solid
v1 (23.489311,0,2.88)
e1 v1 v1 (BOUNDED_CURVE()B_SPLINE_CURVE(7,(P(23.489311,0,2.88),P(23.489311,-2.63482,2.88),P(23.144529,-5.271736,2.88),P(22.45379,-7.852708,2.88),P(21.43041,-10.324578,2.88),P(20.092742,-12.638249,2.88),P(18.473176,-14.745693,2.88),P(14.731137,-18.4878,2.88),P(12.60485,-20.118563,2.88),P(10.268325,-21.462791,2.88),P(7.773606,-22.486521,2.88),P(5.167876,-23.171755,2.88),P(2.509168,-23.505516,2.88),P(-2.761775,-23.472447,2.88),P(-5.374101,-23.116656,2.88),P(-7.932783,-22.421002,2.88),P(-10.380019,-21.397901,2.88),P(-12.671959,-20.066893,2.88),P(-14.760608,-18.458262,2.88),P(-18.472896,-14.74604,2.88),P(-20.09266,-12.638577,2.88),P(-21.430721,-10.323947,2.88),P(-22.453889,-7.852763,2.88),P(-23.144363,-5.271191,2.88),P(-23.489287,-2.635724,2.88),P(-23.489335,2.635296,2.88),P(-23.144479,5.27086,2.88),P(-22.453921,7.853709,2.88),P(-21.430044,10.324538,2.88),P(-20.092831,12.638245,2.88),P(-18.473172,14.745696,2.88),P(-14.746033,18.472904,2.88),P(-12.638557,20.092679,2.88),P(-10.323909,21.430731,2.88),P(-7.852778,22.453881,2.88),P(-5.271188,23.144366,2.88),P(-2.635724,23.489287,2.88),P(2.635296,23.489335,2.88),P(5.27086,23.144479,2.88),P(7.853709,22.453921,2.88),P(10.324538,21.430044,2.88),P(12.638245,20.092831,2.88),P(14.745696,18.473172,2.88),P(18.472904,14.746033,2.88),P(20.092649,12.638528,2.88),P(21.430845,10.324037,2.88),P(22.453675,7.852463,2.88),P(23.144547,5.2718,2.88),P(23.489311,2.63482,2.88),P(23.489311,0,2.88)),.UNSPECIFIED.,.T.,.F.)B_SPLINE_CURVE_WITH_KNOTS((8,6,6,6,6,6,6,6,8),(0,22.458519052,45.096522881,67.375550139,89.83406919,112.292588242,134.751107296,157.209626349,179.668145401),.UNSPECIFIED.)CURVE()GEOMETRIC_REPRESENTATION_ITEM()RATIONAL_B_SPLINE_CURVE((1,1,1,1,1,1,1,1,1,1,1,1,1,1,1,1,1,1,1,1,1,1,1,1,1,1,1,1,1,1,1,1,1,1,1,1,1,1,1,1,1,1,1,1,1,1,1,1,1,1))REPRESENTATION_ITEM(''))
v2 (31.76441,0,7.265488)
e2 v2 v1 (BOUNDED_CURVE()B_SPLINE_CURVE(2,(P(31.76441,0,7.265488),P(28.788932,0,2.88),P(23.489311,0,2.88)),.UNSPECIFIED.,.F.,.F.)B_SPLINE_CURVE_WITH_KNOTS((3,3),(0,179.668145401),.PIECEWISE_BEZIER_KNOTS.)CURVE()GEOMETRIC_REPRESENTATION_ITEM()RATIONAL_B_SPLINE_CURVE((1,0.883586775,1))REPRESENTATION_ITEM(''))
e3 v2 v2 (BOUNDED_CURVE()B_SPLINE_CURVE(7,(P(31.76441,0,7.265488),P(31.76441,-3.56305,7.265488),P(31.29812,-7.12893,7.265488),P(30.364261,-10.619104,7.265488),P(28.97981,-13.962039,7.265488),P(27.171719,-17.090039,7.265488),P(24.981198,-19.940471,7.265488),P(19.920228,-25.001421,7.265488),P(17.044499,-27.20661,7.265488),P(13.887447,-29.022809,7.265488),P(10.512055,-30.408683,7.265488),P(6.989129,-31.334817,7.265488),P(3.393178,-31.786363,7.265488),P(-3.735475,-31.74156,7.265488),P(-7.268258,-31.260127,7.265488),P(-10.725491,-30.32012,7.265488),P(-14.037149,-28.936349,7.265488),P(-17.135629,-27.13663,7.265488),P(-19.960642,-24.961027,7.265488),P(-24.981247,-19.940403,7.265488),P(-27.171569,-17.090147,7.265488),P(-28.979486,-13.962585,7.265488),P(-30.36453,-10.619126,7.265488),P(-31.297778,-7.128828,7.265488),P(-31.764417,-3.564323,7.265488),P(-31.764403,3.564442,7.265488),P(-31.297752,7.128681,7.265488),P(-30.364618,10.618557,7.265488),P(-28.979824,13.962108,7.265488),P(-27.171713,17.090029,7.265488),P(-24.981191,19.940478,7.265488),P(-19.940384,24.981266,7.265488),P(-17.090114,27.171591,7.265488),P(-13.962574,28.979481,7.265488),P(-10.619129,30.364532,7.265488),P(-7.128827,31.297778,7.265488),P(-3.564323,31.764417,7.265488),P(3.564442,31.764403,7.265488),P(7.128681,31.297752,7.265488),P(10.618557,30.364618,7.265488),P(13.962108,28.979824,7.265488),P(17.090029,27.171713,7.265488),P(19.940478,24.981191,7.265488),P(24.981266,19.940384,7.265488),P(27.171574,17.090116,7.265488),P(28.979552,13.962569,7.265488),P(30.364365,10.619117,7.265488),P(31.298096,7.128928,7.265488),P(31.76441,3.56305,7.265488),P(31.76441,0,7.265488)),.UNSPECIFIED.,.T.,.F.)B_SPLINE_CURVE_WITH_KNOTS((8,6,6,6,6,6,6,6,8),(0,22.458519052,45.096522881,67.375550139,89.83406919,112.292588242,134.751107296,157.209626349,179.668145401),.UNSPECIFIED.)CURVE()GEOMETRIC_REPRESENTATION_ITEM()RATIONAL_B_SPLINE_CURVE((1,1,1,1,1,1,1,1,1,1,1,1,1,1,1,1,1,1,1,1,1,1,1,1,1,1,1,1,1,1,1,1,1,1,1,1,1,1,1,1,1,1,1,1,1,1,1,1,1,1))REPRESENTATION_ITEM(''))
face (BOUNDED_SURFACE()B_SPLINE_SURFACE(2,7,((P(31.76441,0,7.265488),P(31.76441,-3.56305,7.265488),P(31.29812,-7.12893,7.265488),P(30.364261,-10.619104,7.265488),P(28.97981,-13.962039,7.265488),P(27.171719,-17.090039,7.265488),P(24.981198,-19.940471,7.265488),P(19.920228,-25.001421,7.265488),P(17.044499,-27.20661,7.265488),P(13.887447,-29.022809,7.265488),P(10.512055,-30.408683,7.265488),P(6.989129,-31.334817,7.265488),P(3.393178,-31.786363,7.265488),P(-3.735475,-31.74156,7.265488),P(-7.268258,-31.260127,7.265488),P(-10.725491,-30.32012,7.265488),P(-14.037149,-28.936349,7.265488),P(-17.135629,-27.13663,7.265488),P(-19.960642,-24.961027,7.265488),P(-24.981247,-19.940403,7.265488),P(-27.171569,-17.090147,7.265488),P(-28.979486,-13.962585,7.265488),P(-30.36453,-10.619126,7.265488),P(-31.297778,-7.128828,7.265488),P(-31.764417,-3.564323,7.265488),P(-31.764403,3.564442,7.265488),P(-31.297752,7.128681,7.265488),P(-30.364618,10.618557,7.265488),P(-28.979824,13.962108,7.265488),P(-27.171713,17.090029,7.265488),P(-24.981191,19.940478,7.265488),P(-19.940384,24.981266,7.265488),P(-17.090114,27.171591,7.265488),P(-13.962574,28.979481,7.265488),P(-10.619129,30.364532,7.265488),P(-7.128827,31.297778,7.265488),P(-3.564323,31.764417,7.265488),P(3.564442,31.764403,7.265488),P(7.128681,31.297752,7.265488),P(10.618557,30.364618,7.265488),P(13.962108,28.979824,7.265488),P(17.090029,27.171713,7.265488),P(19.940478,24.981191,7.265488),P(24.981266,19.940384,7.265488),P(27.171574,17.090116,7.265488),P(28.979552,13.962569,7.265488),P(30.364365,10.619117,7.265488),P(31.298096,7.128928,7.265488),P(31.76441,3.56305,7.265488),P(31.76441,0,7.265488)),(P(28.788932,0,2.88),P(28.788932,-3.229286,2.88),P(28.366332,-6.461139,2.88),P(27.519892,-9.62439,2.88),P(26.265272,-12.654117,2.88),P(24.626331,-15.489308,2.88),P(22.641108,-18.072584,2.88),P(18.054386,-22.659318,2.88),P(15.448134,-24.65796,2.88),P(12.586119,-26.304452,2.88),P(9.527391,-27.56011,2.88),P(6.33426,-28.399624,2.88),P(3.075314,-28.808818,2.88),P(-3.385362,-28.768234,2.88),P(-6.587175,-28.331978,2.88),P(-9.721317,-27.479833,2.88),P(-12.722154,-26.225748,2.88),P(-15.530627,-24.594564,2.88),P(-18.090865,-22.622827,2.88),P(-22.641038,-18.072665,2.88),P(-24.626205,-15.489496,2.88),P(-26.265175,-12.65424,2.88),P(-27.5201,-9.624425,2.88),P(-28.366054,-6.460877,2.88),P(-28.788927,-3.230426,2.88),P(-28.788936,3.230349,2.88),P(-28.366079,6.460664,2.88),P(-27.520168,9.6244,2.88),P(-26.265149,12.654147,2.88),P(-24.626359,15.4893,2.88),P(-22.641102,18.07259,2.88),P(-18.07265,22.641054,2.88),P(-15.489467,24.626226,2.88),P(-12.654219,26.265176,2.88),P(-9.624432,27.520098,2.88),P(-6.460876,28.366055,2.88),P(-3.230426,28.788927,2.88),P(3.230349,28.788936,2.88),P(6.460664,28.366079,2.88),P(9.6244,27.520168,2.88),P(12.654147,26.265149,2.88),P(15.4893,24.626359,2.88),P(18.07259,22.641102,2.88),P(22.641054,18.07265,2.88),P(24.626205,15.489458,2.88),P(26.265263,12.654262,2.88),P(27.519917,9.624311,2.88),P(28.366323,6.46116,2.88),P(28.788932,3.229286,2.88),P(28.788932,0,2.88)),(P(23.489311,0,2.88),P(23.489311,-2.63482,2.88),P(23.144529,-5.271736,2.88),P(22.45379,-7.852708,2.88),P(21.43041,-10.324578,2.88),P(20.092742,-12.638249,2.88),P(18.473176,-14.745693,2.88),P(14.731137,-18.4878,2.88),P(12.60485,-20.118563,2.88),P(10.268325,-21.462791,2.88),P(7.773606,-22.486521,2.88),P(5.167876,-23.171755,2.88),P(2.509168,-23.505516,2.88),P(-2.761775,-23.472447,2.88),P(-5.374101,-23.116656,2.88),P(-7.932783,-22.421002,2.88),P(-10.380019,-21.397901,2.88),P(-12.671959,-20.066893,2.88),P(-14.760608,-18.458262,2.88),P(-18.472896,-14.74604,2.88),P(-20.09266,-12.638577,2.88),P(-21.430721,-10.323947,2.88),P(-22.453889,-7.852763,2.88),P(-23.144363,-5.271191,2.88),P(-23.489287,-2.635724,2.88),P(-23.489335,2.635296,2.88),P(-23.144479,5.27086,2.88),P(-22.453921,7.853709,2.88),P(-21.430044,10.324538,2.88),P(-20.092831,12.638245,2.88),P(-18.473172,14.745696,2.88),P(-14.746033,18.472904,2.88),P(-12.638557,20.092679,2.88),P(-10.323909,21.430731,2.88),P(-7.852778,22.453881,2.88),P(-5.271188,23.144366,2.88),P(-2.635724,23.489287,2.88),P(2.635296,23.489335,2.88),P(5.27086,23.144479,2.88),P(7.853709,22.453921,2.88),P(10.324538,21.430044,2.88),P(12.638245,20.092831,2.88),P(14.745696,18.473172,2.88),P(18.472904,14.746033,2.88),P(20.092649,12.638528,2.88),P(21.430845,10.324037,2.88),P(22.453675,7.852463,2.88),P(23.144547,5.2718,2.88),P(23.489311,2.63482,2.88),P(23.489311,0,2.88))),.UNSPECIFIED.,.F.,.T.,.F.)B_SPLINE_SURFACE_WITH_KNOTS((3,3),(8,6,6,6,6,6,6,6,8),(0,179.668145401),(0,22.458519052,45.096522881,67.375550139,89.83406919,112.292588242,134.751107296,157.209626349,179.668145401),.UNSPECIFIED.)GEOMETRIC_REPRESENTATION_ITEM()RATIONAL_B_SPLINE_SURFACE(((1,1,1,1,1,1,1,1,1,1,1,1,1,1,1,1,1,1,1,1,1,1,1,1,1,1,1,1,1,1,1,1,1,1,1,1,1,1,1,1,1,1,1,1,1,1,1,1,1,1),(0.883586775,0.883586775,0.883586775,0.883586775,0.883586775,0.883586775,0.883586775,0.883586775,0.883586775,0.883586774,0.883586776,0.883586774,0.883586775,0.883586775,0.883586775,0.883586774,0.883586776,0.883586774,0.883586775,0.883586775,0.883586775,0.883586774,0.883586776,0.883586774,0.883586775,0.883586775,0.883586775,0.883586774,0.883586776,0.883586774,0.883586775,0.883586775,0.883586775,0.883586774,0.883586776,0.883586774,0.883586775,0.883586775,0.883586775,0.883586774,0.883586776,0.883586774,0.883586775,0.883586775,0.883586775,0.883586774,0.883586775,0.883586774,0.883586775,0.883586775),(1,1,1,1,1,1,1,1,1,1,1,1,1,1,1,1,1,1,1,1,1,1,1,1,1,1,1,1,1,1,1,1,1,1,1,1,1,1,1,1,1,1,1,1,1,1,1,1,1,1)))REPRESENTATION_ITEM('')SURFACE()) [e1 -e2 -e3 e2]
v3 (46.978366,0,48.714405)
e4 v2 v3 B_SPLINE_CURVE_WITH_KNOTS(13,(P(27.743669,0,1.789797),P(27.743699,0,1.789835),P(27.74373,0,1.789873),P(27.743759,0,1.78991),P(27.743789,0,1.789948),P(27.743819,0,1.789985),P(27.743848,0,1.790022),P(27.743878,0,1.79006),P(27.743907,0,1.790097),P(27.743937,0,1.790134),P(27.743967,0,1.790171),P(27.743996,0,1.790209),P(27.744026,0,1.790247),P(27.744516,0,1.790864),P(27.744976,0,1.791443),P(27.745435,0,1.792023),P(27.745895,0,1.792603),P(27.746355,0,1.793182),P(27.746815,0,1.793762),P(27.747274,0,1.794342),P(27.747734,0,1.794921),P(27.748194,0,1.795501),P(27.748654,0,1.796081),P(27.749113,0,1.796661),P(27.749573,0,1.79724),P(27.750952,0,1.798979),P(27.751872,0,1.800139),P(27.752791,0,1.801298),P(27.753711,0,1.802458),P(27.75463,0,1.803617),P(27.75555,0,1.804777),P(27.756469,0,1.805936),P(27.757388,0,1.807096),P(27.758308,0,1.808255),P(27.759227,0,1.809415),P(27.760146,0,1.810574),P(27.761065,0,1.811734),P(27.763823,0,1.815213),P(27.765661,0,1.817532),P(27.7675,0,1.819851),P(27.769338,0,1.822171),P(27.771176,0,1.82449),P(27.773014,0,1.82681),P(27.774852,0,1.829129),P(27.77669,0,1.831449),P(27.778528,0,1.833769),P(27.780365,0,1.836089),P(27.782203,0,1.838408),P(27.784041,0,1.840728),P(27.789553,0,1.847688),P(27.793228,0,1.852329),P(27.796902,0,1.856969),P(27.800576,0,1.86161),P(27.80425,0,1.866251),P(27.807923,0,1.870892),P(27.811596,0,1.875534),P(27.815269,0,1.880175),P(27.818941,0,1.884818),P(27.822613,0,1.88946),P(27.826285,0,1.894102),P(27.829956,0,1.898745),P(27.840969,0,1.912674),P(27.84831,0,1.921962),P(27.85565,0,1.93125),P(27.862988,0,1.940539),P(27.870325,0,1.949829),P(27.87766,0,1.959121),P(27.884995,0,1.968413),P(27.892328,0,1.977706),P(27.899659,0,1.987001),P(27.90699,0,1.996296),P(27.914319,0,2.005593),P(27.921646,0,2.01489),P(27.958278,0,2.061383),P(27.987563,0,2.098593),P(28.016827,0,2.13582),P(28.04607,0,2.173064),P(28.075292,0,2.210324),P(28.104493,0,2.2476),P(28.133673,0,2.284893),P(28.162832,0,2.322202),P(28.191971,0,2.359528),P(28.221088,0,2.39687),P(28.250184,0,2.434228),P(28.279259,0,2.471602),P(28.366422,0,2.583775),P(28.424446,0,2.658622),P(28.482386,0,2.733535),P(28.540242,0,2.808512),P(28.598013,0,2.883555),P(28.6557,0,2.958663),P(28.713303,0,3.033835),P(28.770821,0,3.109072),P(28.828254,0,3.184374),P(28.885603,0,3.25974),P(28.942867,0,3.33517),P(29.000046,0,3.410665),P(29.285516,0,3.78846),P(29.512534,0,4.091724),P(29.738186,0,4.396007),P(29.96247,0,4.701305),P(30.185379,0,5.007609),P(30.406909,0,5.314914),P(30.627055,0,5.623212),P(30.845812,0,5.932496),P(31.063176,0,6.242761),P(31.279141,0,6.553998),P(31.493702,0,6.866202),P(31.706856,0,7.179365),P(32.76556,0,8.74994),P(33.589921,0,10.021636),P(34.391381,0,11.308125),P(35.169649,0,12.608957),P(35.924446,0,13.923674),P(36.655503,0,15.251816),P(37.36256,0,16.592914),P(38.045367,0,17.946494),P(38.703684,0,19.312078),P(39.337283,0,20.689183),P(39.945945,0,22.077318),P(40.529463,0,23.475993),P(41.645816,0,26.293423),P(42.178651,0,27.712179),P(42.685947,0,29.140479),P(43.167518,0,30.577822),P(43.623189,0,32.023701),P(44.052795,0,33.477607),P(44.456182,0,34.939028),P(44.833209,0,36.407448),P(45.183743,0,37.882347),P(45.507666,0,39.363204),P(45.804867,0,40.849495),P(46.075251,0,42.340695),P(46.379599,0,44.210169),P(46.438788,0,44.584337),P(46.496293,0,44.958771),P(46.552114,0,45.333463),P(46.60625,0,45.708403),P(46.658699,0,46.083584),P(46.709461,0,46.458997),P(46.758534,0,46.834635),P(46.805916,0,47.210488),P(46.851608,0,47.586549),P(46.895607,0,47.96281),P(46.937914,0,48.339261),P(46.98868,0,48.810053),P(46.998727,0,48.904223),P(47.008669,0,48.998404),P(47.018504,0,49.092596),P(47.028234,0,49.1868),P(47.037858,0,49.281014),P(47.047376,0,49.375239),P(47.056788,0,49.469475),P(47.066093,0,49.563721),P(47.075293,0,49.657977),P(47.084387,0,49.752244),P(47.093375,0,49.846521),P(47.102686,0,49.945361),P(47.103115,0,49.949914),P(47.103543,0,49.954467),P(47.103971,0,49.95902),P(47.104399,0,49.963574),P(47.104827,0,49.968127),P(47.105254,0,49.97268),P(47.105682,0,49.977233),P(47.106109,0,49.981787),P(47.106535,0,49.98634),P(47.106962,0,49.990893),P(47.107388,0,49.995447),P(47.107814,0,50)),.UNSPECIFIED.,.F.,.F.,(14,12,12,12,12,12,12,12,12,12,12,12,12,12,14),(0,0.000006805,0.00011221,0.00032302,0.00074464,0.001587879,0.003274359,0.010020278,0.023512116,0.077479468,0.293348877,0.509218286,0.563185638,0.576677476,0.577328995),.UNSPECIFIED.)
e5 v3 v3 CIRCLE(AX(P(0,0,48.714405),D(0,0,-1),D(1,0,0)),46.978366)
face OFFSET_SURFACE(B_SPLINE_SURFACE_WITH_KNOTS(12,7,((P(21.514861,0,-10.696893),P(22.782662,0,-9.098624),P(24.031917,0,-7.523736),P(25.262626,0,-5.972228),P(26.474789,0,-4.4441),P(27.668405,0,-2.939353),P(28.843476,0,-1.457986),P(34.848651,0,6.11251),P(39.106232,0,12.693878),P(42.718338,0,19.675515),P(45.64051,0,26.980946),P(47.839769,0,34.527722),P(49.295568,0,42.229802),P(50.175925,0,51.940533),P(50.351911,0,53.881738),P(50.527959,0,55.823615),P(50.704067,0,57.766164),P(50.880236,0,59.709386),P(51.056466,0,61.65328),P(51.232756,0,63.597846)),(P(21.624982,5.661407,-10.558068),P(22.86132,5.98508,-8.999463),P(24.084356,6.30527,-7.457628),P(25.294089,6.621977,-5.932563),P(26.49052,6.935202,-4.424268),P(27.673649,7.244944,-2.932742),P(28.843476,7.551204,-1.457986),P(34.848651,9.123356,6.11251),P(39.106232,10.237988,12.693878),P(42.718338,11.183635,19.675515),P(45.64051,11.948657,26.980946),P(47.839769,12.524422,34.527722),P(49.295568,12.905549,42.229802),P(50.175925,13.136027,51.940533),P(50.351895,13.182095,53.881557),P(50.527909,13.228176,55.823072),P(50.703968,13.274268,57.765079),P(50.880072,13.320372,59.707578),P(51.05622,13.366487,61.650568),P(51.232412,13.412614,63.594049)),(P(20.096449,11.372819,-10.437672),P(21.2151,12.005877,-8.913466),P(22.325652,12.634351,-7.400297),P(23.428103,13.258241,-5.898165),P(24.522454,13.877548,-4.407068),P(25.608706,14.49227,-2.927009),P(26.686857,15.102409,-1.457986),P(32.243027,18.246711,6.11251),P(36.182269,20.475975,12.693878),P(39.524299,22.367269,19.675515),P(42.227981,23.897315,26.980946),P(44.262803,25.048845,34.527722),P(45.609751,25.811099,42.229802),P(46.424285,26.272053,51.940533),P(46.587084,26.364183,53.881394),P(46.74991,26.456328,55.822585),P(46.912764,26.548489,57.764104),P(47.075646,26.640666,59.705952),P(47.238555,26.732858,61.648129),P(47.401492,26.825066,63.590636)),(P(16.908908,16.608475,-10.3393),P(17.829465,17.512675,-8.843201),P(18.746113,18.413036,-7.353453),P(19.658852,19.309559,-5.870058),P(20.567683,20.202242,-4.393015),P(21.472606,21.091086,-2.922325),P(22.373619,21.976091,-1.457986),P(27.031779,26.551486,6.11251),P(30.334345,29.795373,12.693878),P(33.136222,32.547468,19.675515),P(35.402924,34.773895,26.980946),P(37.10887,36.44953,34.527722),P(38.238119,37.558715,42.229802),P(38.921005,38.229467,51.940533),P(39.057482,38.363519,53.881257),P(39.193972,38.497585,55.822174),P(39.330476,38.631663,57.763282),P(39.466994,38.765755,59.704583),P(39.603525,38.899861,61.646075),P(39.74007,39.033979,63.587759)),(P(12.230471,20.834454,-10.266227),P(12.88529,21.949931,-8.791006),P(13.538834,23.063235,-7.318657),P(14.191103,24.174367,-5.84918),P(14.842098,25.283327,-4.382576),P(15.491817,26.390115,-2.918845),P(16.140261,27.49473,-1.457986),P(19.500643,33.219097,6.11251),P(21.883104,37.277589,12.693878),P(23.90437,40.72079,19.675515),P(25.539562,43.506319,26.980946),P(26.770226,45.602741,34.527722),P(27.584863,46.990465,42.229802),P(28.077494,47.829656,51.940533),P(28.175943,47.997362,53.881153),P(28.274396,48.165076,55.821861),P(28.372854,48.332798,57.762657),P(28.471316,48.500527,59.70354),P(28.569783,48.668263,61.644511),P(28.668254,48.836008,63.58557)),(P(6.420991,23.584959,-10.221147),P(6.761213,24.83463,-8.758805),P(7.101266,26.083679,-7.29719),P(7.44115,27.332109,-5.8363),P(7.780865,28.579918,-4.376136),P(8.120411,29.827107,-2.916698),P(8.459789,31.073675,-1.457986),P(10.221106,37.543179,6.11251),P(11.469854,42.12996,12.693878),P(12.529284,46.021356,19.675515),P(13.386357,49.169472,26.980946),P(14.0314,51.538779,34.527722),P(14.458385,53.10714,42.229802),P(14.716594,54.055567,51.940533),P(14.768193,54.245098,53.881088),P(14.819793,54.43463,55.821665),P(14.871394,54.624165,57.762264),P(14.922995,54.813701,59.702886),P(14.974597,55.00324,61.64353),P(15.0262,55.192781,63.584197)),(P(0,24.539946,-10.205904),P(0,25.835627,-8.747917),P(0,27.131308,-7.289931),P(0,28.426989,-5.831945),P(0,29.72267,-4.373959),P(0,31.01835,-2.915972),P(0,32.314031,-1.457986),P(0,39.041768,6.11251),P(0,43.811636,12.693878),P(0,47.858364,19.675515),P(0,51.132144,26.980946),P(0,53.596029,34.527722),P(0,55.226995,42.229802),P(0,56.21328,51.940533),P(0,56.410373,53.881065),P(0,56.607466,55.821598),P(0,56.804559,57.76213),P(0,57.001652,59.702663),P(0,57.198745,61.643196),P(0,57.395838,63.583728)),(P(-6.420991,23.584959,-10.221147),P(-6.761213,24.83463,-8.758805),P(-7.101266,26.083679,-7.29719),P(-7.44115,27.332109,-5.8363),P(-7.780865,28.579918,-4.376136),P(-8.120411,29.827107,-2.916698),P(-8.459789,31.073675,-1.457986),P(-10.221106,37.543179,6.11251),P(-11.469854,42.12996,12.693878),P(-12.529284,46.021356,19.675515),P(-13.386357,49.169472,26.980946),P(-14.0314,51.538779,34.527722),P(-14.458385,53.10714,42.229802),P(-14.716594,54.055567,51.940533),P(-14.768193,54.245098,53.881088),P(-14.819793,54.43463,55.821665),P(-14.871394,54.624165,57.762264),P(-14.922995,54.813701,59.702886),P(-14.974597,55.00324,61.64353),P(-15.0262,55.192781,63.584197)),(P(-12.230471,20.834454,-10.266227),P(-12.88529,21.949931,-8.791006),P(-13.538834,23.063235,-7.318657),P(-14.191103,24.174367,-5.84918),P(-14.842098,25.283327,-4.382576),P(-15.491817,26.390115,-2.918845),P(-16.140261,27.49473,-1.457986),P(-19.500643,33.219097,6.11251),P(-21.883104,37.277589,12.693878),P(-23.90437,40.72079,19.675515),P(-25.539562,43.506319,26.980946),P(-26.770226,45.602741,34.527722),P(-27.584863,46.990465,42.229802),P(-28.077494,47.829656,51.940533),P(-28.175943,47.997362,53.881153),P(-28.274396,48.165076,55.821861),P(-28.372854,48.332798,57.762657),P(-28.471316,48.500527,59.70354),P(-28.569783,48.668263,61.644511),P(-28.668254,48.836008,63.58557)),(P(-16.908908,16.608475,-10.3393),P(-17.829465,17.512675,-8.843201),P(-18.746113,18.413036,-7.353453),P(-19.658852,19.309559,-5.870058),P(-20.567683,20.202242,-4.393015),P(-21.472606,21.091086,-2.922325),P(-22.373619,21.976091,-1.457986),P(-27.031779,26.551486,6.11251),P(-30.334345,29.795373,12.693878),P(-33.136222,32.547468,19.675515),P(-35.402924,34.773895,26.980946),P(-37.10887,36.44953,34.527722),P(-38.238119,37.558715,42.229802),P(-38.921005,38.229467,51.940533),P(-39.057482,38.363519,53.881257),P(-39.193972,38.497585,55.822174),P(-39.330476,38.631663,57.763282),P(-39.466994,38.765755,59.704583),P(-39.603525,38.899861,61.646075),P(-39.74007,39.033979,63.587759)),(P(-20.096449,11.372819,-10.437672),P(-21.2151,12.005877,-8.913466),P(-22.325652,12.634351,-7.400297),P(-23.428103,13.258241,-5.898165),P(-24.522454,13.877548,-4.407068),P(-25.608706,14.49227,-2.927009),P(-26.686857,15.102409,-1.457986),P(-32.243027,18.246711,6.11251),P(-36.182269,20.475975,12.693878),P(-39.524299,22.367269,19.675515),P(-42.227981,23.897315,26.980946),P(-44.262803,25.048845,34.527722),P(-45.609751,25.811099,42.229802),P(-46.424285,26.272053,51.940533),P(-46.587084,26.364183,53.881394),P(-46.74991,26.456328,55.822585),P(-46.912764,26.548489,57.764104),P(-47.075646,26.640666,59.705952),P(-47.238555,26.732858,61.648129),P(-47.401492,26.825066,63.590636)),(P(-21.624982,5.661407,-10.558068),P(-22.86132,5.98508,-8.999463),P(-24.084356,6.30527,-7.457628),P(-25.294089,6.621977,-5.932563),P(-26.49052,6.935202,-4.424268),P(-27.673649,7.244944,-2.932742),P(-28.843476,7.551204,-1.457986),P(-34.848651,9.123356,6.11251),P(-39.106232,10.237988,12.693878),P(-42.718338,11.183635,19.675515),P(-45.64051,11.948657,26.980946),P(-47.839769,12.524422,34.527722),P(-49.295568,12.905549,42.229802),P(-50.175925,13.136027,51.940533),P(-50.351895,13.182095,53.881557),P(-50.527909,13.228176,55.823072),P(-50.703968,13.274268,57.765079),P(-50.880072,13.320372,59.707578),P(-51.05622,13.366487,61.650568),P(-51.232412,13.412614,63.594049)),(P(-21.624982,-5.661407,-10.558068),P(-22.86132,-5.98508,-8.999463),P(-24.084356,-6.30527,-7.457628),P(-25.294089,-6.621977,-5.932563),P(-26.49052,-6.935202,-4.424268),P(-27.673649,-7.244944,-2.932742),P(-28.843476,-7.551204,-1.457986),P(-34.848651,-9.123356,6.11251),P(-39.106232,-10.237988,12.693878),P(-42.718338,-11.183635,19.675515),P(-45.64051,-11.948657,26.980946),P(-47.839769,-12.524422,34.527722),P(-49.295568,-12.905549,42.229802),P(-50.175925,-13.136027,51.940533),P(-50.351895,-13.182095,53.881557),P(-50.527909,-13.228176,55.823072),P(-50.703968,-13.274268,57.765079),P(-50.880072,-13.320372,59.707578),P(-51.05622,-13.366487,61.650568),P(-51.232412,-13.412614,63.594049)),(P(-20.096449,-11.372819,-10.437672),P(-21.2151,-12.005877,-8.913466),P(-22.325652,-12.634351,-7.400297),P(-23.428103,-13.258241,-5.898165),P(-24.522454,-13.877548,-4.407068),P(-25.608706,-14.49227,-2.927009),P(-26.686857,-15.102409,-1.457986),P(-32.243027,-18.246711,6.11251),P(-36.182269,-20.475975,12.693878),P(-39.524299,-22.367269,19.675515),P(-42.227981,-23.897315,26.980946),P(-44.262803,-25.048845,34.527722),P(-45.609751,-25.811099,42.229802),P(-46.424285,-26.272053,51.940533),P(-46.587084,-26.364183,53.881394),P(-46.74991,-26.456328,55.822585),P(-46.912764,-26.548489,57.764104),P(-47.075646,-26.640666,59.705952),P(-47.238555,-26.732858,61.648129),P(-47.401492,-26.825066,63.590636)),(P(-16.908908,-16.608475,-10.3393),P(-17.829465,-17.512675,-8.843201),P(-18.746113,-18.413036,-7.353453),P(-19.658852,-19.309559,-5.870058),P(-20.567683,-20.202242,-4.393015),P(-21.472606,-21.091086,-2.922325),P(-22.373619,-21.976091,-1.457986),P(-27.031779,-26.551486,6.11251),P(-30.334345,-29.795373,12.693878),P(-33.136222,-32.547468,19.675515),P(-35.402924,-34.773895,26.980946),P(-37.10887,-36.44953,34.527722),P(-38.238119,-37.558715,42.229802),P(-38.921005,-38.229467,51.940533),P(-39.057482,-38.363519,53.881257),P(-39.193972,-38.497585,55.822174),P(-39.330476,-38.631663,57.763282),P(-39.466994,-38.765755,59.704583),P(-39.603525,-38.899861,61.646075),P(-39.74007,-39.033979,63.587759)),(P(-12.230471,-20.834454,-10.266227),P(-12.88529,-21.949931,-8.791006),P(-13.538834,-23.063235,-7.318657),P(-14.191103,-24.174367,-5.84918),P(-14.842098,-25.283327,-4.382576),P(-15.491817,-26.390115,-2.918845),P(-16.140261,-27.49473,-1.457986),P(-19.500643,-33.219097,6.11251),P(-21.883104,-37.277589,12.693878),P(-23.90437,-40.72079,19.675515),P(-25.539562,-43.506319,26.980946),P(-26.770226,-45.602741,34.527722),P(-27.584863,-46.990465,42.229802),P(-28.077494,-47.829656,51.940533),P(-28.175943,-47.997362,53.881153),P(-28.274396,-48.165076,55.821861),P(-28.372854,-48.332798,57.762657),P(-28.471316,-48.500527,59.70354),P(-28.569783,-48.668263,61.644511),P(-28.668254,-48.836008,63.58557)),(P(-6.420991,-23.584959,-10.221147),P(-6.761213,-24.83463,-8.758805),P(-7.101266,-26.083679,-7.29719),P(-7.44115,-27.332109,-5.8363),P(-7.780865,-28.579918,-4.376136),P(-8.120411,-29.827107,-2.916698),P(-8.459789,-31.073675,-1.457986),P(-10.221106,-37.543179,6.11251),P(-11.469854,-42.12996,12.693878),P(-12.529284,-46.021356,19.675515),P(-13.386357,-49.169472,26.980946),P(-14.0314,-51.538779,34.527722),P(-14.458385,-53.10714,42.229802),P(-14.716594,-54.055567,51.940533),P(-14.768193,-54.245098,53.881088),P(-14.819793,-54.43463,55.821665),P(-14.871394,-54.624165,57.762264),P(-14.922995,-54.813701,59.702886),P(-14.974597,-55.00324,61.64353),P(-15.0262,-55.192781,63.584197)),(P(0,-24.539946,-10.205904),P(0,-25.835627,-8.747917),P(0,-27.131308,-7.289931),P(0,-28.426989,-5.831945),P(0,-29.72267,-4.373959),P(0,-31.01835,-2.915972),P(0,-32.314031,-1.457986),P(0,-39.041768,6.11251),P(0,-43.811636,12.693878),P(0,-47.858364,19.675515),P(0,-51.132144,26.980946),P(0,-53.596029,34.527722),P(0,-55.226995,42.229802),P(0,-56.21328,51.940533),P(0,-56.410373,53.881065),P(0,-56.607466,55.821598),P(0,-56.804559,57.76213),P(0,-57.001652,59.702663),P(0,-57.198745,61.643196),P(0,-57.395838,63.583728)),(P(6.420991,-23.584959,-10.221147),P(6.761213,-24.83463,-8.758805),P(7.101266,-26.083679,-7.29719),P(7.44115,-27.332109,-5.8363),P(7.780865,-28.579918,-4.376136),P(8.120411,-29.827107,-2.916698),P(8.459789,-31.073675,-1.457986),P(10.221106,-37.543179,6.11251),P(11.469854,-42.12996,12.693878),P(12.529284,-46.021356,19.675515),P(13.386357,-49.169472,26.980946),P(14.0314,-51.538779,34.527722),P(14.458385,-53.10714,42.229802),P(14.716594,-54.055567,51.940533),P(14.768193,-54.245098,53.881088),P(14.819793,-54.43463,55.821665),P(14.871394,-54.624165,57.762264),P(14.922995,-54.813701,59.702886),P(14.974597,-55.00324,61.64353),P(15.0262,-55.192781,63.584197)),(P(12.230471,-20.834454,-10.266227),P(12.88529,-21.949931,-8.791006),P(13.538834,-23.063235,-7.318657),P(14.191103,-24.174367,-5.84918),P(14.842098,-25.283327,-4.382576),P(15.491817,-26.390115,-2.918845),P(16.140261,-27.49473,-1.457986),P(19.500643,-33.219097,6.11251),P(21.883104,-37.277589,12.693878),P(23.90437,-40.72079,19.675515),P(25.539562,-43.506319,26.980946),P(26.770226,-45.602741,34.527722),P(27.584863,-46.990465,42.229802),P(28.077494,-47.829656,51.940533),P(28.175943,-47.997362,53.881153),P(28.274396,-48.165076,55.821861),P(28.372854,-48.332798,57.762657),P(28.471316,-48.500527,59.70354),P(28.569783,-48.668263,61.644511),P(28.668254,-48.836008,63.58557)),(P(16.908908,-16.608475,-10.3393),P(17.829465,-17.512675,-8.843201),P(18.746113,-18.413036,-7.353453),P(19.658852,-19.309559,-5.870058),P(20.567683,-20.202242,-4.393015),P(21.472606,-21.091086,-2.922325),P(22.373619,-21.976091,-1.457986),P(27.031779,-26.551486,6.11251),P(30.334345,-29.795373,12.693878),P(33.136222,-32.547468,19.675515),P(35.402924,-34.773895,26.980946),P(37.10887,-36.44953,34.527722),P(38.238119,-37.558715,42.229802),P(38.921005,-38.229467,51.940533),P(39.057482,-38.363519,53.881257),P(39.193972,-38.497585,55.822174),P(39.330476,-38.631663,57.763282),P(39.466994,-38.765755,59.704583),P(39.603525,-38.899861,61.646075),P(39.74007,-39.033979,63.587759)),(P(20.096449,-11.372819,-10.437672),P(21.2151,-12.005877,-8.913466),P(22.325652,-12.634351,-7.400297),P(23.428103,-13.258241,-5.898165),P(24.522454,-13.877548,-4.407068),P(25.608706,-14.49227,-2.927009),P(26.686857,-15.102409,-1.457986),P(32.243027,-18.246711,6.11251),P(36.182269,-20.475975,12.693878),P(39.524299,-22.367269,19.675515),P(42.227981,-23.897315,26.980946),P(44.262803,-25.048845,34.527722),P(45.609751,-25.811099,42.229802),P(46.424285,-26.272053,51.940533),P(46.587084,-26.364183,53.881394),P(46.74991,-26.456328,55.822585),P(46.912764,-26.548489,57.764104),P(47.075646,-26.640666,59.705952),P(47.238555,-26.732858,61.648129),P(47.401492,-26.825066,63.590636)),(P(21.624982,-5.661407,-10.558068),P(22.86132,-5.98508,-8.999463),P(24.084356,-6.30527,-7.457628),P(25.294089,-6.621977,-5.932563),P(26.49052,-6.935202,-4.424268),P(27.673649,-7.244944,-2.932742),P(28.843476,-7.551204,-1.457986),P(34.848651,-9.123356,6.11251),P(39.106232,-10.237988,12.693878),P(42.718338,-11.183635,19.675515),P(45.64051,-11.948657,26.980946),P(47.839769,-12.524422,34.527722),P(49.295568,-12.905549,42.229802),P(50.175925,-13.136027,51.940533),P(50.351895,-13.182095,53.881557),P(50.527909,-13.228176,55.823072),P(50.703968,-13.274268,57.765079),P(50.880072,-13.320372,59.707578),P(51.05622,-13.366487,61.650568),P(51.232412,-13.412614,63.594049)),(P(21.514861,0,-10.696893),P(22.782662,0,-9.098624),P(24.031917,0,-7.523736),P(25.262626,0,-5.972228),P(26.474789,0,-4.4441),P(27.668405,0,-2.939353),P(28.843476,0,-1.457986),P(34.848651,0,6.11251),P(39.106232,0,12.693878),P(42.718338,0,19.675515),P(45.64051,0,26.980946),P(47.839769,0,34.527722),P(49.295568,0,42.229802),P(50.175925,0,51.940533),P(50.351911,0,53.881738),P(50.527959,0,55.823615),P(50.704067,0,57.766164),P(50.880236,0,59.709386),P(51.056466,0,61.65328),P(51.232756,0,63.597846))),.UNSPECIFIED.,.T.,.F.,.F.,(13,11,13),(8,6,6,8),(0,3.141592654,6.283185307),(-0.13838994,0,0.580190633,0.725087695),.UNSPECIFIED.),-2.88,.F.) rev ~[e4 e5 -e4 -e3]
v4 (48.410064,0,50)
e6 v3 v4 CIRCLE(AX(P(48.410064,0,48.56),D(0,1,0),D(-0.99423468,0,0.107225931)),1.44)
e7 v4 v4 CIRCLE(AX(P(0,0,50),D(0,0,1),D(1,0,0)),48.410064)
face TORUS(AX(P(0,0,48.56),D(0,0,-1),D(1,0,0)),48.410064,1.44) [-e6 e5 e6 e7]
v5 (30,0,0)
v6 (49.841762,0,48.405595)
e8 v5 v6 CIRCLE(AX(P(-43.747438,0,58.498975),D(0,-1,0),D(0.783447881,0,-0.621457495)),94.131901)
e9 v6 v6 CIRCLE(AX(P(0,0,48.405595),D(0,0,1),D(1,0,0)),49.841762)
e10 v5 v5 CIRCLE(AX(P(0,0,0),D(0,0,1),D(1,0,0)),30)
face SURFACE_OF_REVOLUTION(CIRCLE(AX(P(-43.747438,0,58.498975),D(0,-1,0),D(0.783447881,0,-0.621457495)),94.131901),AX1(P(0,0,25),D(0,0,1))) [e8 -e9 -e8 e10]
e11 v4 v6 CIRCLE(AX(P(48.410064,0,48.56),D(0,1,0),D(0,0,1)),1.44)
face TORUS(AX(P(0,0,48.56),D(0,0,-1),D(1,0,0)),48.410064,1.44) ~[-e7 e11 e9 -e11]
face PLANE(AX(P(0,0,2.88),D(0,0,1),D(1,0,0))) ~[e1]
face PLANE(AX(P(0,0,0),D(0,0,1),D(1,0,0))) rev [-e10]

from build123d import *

# Parameters (mm, degrees)
F3_T = -2.88
F4_R = 10


# Not quite as in the source:
# - a fillet or chamfer that OpenCascade refuses, or shapes differently, is made with other operations: its cross-section is extruded or revolved along the edge and cut away or added


with BuildPart() as f2:
    # F1 (on Front) → F2 (revolve)
    with BuildSketch(Plane.XZ):
        with BuildLine():
            Line((0, 50), (0, 0))
            Line((0, 0), (30, 0))
            ThreePointArc((30, 0), (43.6518375699, 23.5392649721), (50, 50))
            Line((50, 50), (0, 50))
        make_face()
    revolve(axis=Axis((0, 0, 25), (0, 0, 1)))

    # F3
    f3_openings = [f2.faces().sort_by_distance(p)[0] for p in [
        (0, 0, 50),
    ]]
    offset(amount=F3_T, openings=f3_openings)

    # F4
    f4_edges = [f2.edges().sort_by_distance(p)[0] for p in [
        (-28.595074, 0, 2.88),
    ]]
    fillet(f4_edges, radius=F4_R)

    # F5: fillet of radius 1.44 on 2 edges, made by hand

    # F5_s1 → F5_t2 (revolve, cut)
    with BuildSketch(Plane.XZ):
        with BuildLine():
            ThreePointArc((48.4100641855, 50), (49.4814986652, 49.5220957102), (49.8417621254, 48.4055946606))
            ThreePointArc((49.8417621254, 48.4055946606), (49.9242734615, 49.2024606493), (50, 50))
            Line((50, 50), (48.4100641855, 50))
        make_face()
    revolve(axis=Axis((0, 0, 50), (0, 0, 1)), mode=Mode.SUBTRACT)

    # F5_s3 → F5_t4 (revolve, cut)
    with BuildSketch(Plane.XZ):
        with BuildLine():
            ThreePointArc((46.9783662426, 48.7144053403), (47.4479684725, 49.63143448), (48.4100641824, 50))
            Line((48.4100641824, 50), (47.1078138243, 50))
            ThreePointArc((47.1078138243, 50), (47.0453655077, 49.3569735508), (46.9783662426, 48.7144053403))
        make_face()
    revolve(axis=Axis((-1.2e-09, -1e-10, 50), (0, 0, -1)), mode=Mode.SUBTRACT)


solid = f2.part
